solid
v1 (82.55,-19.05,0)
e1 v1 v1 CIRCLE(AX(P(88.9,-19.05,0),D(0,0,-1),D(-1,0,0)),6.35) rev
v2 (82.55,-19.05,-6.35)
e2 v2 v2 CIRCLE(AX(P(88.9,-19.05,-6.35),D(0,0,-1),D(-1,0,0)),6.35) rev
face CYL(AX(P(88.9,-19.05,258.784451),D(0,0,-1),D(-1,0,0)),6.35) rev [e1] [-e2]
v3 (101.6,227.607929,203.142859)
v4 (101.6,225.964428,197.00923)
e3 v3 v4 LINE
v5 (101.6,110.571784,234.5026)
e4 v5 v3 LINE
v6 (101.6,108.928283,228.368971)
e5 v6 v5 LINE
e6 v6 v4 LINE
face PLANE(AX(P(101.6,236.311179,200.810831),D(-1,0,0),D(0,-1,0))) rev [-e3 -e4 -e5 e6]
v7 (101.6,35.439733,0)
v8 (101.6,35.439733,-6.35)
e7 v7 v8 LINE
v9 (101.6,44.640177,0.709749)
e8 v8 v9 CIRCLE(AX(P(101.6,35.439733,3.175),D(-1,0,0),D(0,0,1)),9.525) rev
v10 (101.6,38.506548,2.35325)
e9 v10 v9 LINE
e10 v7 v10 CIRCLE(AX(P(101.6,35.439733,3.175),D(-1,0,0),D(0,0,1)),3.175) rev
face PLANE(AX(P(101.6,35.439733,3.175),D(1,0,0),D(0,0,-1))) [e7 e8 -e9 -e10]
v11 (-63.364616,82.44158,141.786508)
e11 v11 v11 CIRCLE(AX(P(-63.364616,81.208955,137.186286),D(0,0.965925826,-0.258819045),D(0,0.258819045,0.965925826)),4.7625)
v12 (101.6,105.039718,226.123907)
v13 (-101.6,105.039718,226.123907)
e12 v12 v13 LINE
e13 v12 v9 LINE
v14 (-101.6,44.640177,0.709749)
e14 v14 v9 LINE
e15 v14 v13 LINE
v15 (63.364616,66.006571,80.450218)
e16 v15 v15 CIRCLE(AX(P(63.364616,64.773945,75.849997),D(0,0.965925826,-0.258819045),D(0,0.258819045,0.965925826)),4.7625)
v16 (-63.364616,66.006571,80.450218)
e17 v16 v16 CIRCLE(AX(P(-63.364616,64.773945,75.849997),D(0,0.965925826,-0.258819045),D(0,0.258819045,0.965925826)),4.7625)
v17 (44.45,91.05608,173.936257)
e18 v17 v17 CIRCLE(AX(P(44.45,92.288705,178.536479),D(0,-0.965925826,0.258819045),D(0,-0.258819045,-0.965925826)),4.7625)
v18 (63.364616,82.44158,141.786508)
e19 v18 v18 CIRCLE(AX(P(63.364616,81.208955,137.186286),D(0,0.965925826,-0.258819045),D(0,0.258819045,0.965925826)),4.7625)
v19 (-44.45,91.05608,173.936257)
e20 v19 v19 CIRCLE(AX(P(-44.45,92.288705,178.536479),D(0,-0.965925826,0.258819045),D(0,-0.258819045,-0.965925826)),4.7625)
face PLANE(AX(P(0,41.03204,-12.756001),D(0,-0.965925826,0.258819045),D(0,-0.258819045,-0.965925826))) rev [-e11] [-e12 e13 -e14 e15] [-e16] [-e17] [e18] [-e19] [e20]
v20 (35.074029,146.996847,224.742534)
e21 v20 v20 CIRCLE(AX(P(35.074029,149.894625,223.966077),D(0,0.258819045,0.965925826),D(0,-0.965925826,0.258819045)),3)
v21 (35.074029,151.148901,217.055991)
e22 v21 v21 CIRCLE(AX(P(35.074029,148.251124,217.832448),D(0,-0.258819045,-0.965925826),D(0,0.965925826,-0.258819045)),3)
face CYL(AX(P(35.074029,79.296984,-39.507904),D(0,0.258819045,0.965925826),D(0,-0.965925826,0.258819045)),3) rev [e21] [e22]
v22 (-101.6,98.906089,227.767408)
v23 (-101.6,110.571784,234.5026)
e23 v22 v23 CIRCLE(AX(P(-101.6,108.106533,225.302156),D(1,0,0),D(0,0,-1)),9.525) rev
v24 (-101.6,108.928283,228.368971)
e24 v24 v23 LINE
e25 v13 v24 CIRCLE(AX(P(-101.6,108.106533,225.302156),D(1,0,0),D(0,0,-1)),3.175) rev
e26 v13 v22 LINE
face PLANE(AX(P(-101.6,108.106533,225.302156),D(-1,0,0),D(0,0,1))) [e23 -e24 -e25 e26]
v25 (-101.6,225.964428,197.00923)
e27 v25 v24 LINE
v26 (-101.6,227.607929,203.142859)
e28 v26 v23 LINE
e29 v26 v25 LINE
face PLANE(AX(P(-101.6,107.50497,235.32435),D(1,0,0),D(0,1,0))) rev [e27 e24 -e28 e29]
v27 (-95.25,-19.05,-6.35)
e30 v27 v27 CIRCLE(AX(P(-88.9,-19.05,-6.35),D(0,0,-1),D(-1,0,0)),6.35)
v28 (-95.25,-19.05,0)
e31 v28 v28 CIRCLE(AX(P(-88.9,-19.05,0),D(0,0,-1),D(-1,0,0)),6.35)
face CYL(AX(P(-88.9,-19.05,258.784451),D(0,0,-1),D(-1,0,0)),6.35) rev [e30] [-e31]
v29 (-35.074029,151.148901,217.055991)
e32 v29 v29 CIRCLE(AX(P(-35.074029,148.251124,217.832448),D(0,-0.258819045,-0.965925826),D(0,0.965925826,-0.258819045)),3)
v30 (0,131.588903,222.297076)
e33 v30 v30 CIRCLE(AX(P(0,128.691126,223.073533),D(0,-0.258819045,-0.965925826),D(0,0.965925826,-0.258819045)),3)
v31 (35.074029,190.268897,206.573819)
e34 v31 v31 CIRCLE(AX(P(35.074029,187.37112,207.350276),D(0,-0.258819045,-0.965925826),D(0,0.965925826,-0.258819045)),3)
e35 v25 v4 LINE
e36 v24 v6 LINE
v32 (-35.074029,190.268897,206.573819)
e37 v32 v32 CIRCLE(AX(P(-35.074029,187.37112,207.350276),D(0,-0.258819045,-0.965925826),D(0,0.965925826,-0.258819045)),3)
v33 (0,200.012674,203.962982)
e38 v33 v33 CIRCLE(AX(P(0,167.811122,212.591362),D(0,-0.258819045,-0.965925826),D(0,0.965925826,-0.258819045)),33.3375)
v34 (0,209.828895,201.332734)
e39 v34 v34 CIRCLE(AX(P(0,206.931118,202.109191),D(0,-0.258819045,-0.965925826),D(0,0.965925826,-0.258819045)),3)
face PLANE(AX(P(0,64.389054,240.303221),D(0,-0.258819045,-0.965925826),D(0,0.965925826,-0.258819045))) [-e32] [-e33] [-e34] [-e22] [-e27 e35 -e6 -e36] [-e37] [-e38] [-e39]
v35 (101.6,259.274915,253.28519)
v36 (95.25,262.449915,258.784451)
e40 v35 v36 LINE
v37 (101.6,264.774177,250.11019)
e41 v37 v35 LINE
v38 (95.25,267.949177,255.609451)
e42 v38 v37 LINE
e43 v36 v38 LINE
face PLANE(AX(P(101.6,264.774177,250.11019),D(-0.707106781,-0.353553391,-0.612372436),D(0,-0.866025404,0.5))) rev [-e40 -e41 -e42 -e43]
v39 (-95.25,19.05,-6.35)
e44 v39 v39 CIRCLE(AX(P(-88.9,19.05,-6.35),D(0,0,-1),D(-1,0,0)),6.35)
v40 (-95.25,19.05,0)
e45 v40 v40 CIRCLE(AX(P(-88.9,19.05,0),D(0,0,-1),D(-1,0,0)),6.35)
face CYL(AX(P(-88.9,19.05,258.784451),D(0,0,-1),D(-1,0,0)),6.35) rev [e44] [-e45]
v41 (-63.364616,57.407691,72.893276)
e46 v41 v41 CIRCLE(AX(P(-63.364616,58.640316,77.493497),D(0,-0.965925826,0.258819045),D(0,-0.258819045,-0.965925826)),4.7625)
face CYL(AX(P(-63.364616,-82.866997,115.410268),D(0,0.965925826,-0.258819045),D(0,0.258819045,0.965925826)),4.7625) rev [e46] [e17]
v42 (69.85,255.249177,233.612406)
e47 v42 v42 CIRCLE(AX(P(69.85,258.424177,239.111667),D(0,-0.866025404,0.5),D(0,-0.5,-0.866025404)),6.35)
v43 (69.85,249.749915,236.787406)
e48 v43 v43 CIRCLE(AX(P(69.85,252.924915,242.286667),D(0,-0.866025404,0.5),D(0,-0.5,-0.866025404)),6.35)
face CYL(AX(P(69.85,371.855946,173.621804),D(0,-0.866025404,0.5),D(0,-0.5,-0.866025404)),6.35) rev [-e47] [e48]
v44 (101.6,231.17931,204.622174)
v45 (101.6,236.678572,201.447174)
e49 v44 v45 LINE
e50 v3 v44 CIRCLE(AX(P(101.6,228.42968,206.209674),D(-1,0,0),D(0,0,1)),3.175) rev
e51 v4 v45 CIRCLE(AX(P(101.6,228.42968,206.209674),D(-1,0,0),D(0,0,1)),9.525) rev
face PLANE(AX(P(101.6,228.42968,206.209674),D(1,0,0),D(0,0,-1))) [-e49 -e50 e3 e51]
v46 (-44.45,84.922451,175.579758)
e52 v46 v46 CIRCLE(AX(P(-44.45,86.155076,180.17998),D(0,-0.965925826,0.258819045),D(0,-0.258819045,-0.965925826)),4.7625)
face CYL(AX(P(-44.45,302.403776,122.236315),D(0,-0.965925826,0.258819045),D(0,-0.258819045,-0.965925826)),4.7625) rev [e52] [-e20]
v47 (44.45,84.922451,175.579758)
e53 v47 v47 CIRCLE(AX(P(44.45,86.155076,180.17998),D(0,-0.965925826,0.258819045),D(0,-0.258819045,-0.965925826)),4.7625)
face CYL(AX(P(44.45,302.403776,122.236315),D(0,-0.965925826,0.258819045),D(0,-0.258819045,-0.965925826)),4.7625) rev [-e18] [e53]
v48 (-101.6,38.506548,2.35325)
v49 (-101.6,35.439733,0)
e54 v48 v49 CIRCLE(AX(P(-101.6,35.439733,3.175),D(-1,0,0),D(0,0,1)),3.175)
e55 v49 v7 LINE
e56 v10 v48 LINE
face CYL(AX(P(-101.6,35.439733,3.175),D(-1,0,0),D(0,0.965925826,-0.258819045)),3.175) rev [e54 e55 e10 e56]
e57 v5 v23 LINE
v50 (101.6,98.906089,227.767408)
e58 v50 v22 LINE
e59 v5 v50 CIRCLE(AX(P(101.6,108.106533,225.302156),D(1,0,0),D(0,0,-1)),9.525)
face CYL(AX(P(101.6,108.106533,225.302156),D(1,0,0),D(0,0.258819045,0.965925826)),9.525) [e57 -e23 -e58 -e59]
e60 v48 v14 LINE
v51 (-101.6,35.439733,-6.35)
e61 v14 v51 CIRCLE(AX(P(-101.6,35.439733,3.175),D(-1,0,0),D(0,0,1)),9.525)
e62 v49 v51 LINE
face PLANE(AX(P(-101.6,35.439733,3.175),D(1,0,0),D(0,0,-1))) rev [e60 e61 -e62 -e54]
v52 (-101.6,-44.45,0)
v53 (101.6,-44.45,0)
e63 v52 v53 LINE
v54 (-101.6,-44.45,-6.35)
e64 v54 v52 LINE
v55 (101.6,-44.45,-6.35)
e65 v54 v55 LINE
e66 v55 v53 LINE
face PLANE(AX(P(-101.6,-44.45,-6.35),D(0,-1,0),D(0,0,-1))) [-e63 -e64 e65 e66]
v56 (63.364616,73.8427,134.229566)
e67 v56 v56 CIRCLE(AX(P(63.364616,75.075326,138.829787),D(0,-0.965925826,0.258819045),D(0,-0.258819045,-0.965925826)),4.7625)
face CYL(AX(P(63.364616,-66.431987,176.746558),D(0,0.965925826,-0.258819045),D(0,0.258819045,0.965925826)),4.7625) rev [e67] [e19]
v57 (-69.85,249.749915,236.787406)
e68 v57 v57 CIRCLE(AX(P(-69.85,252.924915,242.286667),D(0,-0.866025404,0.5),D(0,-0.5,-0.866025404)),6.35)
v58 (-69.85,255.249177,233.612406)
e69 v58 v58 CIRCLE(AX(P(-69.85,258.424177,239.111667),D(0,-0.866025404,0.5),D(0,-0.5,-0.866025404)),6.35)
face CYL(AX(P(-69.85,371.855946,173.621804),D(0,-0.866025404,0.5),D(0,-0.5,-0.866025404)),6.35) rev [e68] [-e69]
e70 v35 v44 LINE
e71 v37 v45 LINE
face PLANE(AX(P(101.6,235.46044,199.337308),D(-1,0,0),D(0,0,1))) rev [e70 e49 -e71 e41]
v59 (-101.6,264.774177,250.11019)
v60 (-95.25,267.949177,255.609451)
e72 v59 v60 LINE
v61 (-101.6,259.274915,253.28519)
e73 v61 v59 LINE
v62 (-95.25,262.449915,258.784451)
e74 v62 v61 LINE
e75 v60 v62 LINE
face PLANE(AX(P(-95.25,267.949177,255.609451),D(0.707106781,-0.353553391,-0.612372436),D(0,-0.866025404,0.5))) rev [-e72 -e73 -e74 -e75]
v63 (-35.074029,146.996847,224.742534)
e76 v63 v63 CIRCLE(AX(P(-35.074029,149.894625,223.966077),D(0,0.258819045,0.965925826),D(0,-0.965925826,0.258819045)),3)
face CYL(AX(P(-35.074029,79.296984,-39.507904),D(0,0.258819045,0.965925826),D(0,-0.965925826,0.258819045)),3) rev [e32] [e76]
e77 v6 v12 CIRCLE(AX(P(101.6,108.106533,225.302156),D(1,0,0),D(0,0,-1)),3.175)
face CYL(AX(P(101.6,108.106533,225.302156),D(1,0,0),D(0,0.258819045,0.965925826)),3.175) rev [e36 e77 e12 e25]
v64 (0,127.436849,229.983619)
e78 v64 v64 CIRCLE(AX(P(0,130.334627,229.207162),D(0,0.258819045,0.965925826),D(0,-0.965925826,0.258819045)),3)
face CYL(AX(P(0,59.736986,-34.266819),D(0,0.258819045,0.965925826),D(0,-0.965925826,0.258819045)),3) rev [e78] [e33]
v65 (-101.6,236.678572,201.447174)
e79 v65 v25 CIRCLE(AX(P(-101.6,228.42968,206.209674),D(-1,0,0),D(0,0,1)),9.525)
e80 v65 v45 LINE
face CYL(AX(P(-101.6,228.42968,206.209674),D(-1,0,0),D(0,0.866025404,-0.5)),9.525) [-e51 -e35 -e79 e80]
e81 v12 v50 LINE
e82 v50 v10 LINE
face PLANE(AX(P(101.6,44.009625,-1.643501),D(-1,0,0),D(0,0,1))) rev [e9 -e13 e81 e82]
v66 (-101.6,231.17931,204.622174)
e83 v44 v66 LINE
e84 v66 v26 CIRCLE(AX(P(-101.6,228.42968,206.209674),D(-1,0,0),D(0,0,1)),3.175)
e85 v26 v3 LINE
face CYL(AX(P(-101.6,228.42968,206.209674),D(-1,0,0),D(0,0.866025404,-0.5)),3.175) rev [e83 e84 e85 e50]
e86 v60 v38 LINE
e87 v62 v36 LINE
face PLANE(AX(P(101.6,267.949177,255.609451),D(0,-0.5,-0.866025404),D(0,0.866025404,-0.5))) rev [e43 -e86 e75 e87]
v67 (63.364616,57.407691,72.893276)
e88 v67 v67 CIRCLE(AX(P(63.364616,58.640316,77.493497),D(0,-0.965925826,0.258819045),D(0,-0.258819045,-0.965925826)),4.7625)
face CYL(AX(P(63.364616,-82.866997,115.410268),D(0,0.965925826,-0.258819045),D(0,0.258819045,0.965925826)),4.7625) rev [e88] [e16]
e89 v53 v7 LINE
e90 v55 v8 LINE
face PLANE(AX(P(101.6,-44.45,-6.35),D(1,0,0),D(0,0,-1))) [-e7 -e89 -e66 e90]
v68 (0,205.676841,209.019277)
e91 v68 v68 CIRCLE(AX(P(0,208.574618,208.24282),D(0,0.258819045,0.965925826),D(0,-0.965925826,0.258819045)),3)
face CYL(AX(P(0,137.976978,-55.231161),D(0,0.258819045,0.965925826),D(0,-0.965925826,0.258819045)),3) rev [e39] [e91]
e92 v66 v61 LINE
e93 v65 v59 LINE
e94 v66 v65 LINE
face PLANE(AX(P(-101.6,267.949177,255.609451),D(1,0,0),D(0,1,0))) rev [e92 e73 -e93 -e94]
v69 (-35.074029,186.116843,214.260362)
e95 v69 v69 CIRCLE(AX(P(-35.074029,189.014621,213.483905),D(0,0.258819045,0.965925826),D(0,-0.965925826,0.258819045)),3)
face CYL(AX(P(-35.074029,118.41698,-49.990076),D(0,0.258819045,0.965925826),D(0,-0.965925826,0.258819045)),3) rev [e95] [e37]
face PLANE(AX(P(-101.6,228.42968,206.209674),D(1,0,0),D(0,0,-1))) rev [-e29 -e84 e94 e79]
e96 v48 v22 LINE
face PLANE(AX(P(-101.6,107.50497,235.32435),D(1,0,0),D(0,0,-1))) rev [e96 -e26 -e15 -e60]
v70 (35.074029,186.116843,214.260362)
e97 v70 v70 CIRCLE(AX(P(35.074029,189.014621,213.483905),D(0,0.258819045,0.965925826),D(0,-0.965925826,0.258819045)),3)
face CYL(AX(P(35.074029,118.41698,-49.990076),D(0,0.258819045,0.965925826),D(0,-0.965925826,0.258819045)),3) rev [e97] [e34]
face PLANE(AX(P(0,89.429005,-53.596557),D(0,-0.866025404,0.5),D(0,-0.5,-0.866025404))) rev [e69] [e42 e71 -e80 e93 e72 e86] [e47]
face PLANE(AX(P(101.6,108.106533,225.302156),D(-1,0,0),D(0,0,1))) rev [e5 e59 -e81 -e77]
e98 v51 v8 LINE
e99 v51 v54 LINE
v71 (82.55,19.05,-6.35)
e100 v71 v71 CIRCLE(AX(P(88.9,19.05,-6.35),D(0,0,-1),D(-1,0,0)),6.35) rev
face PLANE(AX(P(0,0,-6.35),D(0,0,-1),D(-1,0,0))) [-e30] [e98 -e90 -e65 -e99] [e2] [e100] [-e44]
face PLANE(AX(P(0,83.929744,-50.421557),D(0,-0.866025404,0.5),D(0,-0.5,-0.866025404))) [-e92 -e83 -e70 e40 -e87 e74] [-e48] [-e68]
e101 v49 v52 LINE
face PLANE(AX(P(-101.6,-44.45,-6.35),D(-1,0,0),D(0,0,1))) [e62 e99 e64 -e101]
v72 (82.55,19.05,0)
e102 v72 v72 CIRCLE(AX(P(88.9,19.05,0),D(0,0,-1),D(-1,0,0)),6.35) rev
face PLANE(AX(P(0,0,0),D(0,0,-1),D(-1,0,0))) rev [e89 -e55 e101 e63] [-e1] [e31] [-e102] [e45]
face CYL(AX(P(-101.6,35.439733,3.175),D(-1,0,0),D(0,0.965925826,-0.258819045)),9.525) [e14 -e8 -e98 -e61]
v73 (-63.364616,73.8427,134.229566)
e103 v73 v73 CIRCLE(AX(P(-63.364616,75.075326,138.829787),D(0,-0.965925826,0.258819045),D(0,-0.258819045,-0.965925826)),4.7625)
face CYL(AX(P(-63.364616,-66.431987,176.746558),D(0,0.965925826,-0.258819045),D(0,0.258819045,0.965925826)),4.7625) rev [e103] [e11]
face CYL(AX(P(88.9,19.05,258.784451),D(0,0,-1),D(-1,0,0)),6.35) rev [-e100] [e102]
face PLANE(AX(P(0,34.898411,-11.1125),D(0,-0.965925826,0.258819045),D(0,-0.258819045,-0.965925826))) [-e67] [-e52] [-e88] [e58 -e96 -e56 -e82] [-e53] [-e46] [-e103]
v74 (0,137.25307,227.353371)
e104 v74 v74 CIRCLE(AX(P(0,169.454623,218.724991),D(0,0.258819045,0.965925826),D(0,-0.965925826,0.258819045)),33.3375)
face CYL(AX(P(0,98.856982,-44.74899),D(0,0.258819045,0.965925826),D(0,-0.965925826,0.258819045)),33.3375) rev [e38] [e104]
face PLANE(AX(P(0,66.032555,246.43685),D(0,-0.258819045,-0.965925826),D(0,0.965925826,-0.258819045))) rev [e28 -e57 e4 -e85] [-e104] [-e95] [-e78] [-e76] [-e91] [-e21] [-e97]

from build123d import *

# Parameters (mm, degrees)
SKETCH2_W                    = 203.2
SKETCH2_H                    = 88.9
BASE_FLANGE1_DEPTH           = 6.35
EDGE_FLANGE1_START           = -101.6
EDGE_FLANGE1_DEPTH           = 203.2
EDGE_FLANGE1_2_DEPTH         = 203.2
EDGE_FLANGE2_STRIP_W         = 31.75
EDGE_FLANGE2_STRIP_H         = 6.35
EDGE_FLANGE2_STRIP_CUT_DEPTH = 203.2
EDGE_FLANGE2_DEPTH           = 203.2
SKETCH13_R                   = 33.3375
SKETCH13_R_2                 = 3
CUT_EXTRUDE1_DEPTH           = 322.27645633
EDGE_FLANGE3_START           = -101.6
EDGE_FLANGE3_DEPTH           = 203.2
EDGE_FLANGE3_2_DEPTH         = 203.2
SKETCH17_R                   = 6.35
CUT_EXTRUDE2_DEPTH           = 373.253425916
SKETCH18_R                   = 4.7625
CUT_EXTRUDE3_DEPTH           = 370.310259163
BREAK_CORNER1_START          = -323.104570995
BREAK_CORNER1_OUTLINE_W      = 145.614442934
BREAK_CORNER1_OUTLINE_H      = 10
BREAK_CORNER1_DEPTH          = 4.490128061
BREAK_CORNER1_START_2        = -183.910601118
BREAK_CORNER1_2_OUTLINE_W    = 5.385557066
BREAK_CORNER1_2_OUTLINE_H    = 10
BREAK_CORNER1_2_DEPTH        = 8.980256121
SKETCH19_R                   = 6.35
CUT_EXTRUDE4_DEPTH           = 391.404403674
SKETCH20_R                   = 4.7625
CUT_EXTRUDE5_DEPTH           = 367.686034552


# Read off the part's stored shape, not the designer's step: Edge-Flange1, Edge-Flange3, Break-Corner1
# Sheet-metal steps are written as plain solids
with BuildPart() as part:
    # Sketch2 → Base-Flange1 (new body)
    with BuildSketch(Plane.XY):
        Rectangle(SKETCH2_W, SKETCH2_H)
    extrude(amount=-BASE_FLANGE1_DEPTH)

    # Edge-Flange1 outline → Edge-Flange1 (cut)
    with BuildSketch(Plane.YZ.offset(EDGE_FLANGE1_START)):
        with BuildLine():
            Line((44.45, 0), (44.419989189, 0))
            ThreePointArc((44.419989189, 0), (40.938994382, -4.602129933), (35.439733068, -6.35))
            Line((35.439733068, -6.35), (44.45, -6.35))
            Line((44.45, -6.35), (44.45, 0))
        make_face()
    extrude(amount=EDGE_FLANGE1_DEPTH, mode=Mode.SUBTRACT)

    # Edge-Flange1 2 outline → Edge-Flange1 2 (add)
    with BuildSketch(Plane.YZ.offset(EDGE_FLANGE1_START)):
        with BuildLine():
            ThreePointArc((44.419989189, 0), (44.537007132, 0.352726165), (44.640176563, 0.709748595))
            Line((44.640176563, 0.709748595), (107.504969662, 235.324350447))
            Line((107.504969662, 235.324350447), (101.371340665, 236.967851383))
            Line((101.371340665, 236.967851383), (38.506547566, 2.353249532))
            ThreePointArc((38.506547566, 2.353249532), (37.372550605, 0.656103145), (35.439733068, 0))
            Line((35.439733068, 0), (44.419989189, 0))
        make_face()
    extrude(amount=EDGE_FLANGE1_2_DEPTH)

    # Edge-Flange2 strip (across the edge) → Edge-Flange2 strip cut (cut)
    with BuildSketch(Plane(origin=(-101.6, 107.504969662, 235.324350447), x_dir=(0, -0.25881904510252135, -0.9659258262890682), z_dir=(1, 0, 0))):
        with Locations((-6.35, -3.175)):
            Rectangle(EDGE_FLANGE2_STRIP_W, EDGE_FLANGE2_STRIP_H)
    extrude(amount=EDGE_FLANGE2_STRIP_CUT_DEPTH, mode=Mode.SUBTRACT)

    # Edge-Flange2 section (across the edge) → Edge-Flange2 (add)
    with BuildSketch(Plane(origin=(-101.6, 107.504969662, 235.324350447), x_dir=(0, -0.25881904510252135, -0.9659258262890682), z_dir=(1, 0, 0))):
        with BuildLine():
            Line((0, 3.175), (0, 133.35))
            Line((0, 133.35), (6.35, 133.35))
            Line((6.35, 133.35), (6.35, 3.175))
            ThreePointArc((6.35, 3.175), (7.27993597, 0.92993597), (9.525, 0))
            Line((9.525, 0), (9.525, -6.35))
            ThreePointArc((9.525, -6.35), (2.789807909, -3.560192091), (0, 3.175))
        make_face()
    extrude(amount=EDGE_FLANGE2_DEPTH)

    # Sketch13 → Cut-Extrude1 (cut, through all)
    with BuildSketch(Plane(origin=(0, 66.032555063, 246.436850447), x_dir=(1, 0, 0), z_dir=(0, 0.25881904510252135, 0.9659258262890682))):
        with Locations(Location((0, 107.070402979, 0), (0, 0, 270))):
            Circle(SKETCH13_R)
        with Locations(Location((35.074028853, 86.820402979, 0), (0, 0, 270))):
            Circle(SKETCH13_R_2)
        with Locations(Location((0, 66.570402979, 0), (0, 0, 270))):
            Circle(SKETCH13_R_2)
        with Locations(Location((-35.074028853, 86.820402979, 0), (0, 0, 270))):
            Circle(SKETCH13_R_2)
        with Locations(Location((-35.074028853, 127.320402979, 0), (0, 0, 270))):
            Circle(SKETCH13_R_2)
        with Locations(Location((35.074028853, 127.320402979, 0), (0, 0, 270))):
            Circle(SKETCH13_R_2)
        with Locations(Location((0, 147.570402979, 0), (0, 0, 270))):
            Circle(SKETCH13_R_2)
    extrude(amount=-CUT_EXTRUDE1_DEPTH, mode=Mode.SUBTRACT)

    # Edge-Flange3 outline → Edge-Flange3 (cut)
    with BuildSketch(Plane.YZ.offset(EDGE_FLANGE3_START)):
        with BuildLine():
            Line((236.311178597, 200.810830783), (236.28219038, 200.818598152))
            ThreePointArc((236.28219038, 200.818598152), (231.72868872, 197.274229745), (225.964428129, 197.009230469))
            Line((225.964428129, 197.009230469), (234.667677661, 194.677201786))
            Line((234.667677661, 194.677201786), (236.311178597, 200.810830783))
        make_face()
    extrude(amount=EDGE_FLANGE3_DEPTH, mode=Mode.SUBTRACT)

    # Edge-Flange3 2 outline → Edge-Flange3 2 (add)
    with BuildSketch(Plane.YZ.offset(EDGE_FLANGE3_START)):
        with BuildLine():
            ThreePointArc((236.28219038, 200.818598152), (236.486513283, 201.129018993), (236.678571505, 201.447173965))
            Line((236.678571505, 201.447173965), (267.949176724, 255.609450989))
            Line((267.949176724, 255.609450989), (262.44991541, 258.784450989))
            Line((262.44991541, 258.784450989), (231.179310191, 204.622173965))
            ThreePointArc((231.179310191, 204.622173965), (229.644699431, 203.276356449), (227.607929065, 203.142859466))
            Line((227.607929065, 203.142859466), (236.28219038, 200.818598152))
        make_face()
    extrude(amount=EDGE_FLANGE3_2_DEPTH)

    # Sketch17 → Cut-Extrude2 (cut, through all)
    with BuildSketch(Plane(origin=(0, 84.780482228, -48.948034236), x_dir=(1, 0, 0), z_dir=(0, -0.8660254037844363, 0.5000000000000042))):
        with Locations(Location((-69.85, 336.288866366, 0), (0, 0, 270))):
            Circle(SKETCH17_R)
        with Locations(Location((69.85, 336.288866366, 0), (0, 0, 270))):
            Circle(SKETCH17_R)
    extrude(amount=-CUT_EXTRUDE2_DEPTH, mode=Mode.SUBTRACT)

    # Sketch18 → Cut-Extrude3 (cut, through all)
    with BuildSketch(Plane(origin=(0, 35.338785602, -9.468999064), x_dir=(1, 0, 0), z_dir=(0, -0.9659258262890673, 0.2588190451025248))):
        with Locations(Location((-44.45, 196.339070344, 0), (0, 0, 270))):
            Circle(SKETCH18_R)
        with Locations(Location((44.45, 196.339070344, 0), (0, 0, 270))):
            Circle(SKETCH18_R)
    extrude(amount=-CUT_EXTRUDE3_DEPTH, mode=Mode.SUBTRACT)

    # Break-Corner1 outline → Break-Corner1 (cut)
    with BuildSketch(Plane(origin=(0, 0, 0), x_dir=(0.7071067811865475, 0.35355339059327684, 0.6123724356957928), z_dir=(0.7071067811865476, -0.3535533905932768, -0.6123724356957927)).offset(BREAK_CORNER1_START)):
        with Locations((245.807221467, -101)):
            Rectangle(BREAK_CORNER1_OUTLINE_W, BREAK_CORNER1_OUTLINE_H)
    extrude(amount=BREAK_CORNER1_DEPTH, mode=Mode.SUBTRACT)

    # Break-Corner1 2 outline → Break-Corner1 2 (cut)
    with BuildSketch(Plane(origin=(0, 0, 0), x_dir=(0.7071067811865475, 0.35355339059327684, 0.6123724356957928), z_dir=(0.7071067811865476, -0.3535533905932768, -0.6123724356957927)).offset(BREAK_CORNER1_START_2)):
        with Locations((321.307221467, -101)):
            Rectangle(BREAK_CORNER1_2_OUTLINE_W, BREAK_CORNER1_2_OUTLINE_H)
    extrude(amount=BREAK_CORNER1_2_DEPTH, mode=Mode.SUBTRACT)

    # Sketch19 → Cut-Extrude4 (cut, through all)
    with BuildSketch(Plane(origin=(0, 0, -6.35), x_dir=(-1, 0, 0), z_dir=(0, 0, -1))):
        with Locations((-88.9, 19.05)):
            Circle(SKETCH19_R)
        with Locations((-88.9, -19.05)):
            Circle(SKETCH19_R)
        with Locations((88.9, -19.05)):
            Circle(SKETCH19_R)
        with Locations((88.9, 19.05)):
            Circle(SKETCH19_R)
    extrude(amount=-CUT_EXTRUDE4_DEPTH, mode=Mode.SUBTRACT)

    # Sketch20 → Cut-Extrude5 (cut, through all)
    with BuildSketch(Plane(origin=(0, 41.472414599, -11.1125), x_dir=(1, 0, 0), z_dir=(0, 0.9659258262890673, -0.2588190451025248))):
        with Locations(Location((63.364615818, -153.530201243, 0), (0, 0, 270))):
            Circle(SKETCH20_R)
        with Locations(Location((63.364615818, -90.030201243, 0), (0, 0, 270))):
            Circle(SKETCH20_R)
        with Locations(Location((-63.364615818, -90.030201243, 0), (0, 0, 270))):
            Circle(SKETCH20_R)
        with Locations(Location((-63.364615818, -153.530201243, 0), (0, 0, 270))):
            Circle(SKETCH20_R)
    extrude(amount=-CUT_EXTRUDE5_DEPTH, mode=Mode.SUBTRACT)


solid = part.part
